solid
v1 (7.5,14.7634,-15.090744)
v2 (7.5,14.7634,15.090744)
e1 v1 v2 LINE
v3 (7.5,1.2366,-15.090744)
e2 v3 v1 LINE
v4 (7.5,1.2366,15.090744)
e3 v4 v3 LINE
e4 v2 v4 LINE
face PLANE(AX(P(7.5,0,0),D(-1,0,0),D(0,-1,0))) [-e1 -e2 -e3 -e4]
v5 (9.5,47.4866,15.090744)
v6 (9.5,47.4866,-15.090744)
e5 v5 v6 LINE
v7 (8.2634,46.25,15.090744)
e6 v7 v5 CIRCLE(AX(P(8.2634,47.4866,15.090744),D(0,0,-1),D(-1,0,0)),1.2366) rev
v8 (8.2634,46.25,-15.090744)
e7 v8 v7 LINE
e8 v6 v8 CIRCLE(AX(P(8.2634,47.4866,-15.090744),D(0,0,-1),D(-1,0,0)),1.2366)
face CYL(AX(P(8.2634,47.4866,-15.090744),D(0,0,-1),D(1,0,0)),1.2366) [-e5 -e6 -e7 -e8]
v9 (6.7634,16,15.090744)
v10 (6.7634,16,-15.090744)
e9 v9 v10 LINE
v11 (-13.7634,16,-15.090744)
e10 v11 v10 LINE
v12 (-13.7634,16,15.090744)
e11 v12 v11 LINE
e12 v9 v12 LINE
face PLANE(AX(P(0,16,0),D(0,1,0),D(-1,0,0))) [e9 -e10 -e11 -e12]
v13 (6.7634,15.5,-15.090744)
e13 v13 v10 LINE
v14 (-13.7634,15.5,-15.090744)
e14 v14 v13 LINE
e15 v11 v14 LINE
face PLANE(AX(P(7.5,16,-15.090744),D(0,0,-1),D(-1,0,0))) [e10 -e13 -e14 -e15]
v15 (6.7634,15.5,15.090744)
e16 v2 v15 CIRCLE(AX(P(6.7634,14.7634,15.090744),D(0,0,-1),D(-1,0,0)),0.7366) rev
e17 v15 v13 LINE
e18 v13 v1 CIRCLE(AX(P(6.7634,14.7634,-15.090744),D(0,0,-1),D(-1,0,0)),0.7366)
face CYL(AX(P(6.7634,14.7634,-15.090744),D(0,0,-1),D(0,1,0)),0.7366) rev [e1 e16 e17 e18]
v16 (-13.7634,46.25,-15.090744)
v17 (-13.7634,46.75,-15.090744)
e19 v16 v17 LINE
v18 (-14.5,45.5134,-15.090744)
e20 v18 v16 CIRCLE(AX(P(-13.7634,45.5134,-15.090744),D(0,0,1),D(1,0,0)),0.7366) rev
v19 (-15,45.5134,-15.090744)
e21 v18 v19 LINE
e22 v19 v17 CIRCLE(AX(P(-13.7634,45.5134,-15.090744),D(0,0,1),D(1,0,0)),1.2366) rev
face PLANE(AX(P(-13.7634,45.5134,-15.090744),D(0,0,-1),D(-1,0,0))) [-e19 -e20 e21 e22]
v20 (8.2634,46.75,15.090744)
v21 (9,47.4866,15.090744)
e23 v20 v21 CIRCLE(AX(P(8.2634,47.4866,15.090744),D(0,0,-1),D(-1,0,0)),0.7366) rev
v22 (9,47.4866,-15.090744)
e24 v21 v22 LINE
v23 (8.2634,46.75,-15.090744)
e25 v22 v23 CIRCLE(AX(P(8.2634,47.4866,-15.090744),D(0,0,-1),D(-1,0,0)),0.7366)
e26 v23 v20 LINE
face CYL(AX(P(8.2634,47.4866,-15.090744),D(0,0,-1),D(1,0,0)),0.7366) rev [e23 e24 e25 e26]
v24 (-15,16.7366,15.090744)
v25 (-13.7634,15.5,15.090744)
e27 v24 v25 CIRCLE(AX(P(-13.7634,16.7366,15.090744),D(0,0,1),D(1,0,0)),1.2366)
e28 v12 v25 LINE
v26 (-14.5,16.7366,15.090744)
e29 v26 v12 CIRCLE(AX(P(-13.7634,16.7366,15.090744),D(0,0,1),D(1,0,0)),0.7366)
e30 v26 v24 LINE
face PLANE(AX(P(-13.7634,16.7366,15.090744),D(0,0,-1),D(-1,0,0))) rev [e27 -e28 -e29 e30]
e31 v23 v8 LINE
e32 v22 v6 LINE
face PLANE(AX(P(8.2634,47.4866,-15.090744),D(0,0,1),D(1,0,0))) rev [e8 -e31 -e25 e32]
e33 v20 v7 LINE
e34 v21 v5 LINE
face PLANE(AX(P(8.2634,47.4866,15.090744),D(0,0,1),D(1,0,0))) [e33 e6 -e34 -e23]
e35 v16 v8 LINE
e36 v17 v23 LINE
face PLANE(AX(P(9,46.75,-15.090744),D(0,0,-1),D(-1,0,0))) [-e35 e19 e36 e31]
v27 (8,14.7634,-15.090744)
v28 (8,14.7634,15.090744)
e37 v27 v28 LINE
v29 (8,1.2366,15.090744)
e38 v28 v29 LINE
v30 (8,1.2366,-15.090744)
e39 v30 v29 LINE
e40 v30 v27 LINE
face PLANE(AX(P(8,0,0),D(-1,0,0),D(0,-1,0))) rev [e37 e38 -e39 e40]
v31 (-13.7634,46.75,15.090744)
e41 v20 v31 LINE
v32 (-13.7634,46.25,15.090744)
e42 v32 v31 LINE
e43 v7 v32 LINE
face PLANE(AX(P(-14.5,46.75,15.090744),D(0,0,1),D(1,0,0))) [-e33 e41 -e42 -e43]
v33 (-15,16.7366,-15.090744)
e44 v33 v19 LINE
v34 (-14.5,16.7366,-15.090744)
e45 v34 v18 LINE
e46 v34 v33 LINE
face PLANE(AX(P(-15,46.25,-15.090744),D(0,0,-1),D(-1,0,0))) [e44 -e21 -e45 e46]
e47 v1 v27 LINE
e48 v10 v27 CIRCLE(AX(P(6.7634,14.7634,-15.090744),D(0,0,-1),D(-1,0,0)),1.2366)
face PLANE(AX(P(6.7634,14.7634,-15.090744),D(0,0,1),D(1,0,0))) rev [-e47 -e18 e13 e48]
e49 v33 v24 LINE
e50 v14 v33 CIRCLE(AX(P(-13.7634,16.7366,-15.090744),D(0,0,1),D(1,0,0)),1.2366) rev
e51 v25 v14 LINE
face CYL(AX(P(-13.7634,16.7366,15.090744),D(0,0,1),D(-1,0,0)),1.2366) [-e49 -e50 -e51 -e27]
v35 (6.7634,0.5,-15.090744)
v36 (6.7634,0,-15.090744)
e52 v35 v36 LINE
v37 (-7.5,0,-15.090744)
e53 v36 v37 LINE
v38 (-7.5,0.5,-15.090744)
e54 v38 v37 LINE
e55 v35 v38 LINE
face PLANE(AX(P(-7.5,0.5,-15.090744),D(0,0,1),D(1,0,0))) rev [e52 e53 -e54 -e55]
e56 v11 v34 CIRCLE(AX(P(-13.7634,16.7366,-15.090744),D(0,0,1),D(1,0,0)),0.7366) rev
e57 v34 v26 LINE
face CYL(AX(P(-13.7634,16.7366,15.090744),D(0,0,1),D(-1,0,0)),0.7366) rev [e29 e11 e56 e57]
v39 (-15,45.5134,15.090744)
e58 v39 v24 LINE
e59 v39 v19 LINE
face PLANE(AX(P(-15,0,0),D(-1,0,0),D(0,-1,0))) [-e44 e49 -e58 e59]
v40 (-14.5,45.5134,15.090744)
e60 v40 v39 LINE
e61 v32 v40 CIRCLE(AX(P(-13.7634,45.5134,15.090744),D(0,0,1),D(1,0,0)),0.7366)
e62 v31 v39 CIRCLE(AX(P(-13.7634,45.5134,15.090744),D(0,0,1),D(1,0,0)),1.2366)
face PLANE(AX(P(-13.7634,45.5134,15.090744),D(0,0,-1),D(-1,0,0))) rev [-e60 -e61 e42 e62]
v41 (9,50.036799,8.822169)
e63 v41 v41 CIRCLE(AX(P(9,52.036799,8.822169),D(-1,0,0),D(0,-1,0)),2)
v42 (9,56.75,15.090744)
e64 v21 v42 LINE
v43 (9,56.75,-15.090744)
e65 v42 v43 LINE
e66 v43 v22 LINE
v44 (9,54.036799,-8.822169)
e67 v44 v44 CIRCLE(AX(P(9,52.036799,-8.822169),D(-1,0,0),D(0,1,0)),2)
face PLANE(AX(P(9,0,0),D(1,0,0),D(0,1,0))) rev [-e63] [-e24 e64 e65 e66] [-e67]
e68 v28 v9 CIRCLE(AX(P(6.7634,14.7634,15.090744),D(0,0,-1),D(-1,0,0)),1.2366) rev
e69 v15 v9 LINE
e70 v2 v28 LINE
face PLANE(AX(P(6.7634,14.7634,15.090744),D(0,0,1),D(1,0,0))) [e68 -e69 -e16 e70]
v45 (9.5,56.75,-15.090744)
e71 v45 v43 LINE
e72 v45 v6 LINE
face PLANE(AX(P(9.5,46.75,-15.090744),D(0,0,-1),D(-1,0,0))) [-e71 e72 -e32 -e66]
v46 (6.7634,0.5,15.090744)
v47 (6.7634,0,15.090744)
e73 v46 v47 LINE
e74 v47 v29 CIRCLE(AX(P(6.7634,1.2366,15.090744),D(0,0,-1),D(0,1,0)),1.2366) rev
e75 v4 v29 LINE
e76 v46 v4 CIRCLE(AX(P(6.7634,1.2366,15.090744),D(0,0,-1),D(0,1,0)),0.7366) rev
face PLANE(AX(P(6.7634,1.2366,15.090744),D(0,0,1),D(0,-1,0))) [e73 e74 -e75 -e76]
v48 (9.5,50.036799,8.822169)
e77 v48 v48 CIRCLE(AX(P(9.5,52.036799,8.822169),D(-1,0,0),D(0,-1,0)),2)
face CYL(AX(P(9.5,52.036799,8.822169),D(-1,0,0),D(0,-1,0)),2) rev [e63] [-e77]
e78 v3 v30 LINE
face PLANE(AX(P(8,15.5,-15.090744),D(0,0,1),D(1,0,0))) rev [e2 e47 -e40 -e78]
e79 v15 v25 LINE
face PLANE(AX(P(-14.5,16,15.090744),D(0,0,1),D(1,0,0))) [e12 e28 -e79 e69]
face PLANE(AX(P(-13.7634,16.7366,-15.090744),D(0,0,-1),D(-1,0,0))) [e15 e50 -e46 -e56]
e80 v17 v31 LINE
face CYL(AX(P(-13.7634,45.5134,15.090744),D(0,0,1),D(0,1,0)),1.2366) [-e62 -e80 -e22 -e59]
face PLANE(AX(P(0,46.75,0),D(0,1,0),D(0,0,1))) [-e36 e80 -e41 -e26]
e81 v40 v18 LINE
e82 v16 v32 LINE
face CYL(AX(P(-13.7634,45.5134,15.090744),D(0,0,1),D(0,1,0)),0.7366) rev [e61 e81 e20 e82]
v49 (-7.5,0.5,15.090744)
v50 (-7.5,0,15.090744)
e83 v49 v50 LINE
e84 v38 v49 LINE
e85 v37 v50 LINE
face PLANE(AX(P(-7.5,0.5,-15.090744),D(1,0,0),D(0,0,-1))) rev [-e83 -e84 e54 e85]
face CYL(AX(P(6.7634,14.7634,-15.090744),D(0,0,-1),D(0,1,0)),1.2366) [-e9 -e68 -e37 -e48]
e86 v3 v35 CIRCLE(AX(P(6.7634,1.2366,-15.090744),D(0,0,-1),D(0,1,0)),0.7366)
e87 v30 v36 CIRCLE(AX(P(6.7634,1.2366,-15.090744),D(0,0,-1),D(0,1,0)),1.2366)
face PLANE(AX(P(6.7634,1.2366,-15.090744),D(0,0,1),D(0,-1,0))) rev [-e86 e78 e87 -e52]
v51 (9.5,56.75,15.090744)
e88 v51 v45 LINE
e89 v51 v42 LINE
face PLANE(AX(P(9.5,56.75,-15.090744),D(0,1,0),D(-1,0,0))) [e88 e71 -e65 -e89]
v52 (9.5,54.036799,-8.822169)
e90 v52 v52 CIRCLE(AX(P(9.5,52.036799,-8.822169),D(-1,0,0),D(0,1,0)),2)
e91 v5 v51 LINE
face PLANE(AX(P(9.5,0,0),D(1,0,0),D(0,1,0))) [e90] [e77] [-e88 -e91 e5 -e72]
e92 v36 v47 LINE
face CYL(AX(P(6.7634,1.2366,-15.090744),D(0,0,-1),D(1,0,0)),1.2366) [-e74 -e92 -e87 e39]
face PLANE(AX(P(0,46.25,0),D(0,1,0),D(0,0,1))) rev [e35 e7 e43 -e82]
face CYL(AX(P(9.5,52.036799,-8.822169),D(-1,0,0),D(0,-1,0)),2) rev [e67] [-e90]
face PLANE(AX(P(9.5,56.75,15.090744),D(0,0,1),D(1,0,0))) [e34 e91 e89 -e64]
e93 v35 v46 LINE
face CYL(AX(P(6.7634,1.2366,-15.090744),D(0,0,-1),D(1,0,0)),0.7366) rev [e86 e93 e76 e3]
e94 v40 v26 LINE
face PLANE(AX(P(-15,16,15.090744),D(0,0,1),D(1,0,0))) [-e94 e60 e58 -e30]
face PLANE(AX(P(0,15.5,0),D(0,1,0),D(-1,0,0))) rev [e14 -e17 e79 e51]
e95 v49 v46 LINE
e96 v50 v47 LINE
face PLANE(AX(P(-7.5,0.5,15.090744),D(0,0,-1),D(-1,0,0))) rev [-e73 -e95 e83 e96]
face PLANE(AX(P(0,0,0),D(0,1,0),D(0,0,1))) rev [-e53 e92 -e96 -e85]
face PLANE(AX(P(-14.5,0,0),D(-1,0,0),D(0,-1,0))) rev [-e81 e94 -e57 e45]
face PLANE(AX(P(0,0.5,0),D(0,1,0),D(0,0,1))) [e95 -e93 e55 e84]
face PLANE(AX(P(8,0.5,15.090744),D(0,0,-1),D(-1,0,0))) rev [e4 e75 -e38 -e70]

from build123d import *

# Parameters (mm, degrees)
SKETCH1_W                    = 15
SKETCH1_H                    = 30.181487224
BASE_FLANGE2_DEPTH           = 0.5
EDGE_FLANGE1_STRIP_W         = 3.4732
EDGE_FLANGE1_STRIP_H         = 0.5
EDGE_FLANGE1_STRIP_CUT_DEPTH = 30.181487223
EDGE_FLANGE1_DEPTH           = 30.181487223
EDGE_FLANGE2_STRIP_W         = 3.4732
EDGE_FLANGE2_STRIP_H         = 0.5
EDGE_FLANGE2_STRIP_CUT_DEPTH = 30.181487223
EDGE_FLANGE2_DEPTH           = 30.181487223
EDGE_FLANGE6_STRIP_W         = 3.4732
EDGE_FLANGE6_STRIP_H         = 0.5
EDGE_FLANGE6_STRIP_CUT_DEPTH = 30.181487223
EDGE_FLANGE6_DEPTH           = 30.181487223
EDGE_FLANGE7_STRIP_W         = 3.4732
EDGE_FLANGE7_STRIP_H         = 0.5
EDGE_FLANGE7_STRIP_CUT_DEPTH = 30.181487223
EDGE_FLANGE7_DEPTH           = 30.181487223
EDGE_FLANGE8_STRIP_W         = 3.4732
EDGE_FLANGE8_STRIP_H         = 0.5
EDGE_FLANGE8_STRIP_CUT_DEPTH = 30.181487223
EDGE_FLANGE8_DEPTH           = 30.181487223
SKETCH58_R                   = 2
CUT_EXTRUDE1_DEPTH           = 64.437315854


# Sheet-metal steps are written as plain solids
with BuildPart() as part:
    # Sketch1 → Base-Flange2 (new body)
    with BuildSketch(Plane(origin=(0, 0, 0), x_dir=(1, 0, 0), z_dir=(0, 1, 0))):
        Rectangle(SKETCH1_W, SKETCH1_H)
    extrude(amount=BASE_FLANGE2_DEPTH)

    # Edge-Flange1 strip (across the edge) → Edge-Flange1 strip cut (cut)
    with BuildSketch(Plane(origin=(7.5, 0.5, 15.090743612), x_dir=(-1, 0, 0), z_dir=(0, 0, -1))):
        with Locations((-1, -0.25)):
            Rectangle(EDGE_FLANGE1_STRIP_W, EDGE_FLANGE1_STRIP_H)
    extrude(amount=EDGE_FLANGE1_STRIP_CUT_DEPTH, mode=Mode.SUBTRACT)

    # Edge-Flange1 section (across the edge) → Edge-Flange1 (add)
    with BuildSketch(Plane(origin=(7.5, 0.5, 15.090743612), x_dir=(-1, 0, 0), z_dir=(0, 0, -1))):
        with BuildLine():
            Line((-0.5, 0.7366), (-0.5, 15))
            Line((-0.5, 15), (0, 15))
            Line((0, 15), (0, 0.7366))
            ThreePointArc((0, 0.7366), (0.215745145, 0.215745145), (0.7366, 0))
            Line((0.7366, 0), (0.7366, -0.5))
            ThreePointArc((0.7366, -0.5), (-0.137808246, -0.137808246), (-0.5, 0.7366))
        make_face()
    extrude(amount=EDGE_FLANGE1_DEPTH)

    # Edge-Flange2 strip (across the edge) → Edge-Flange2 strip cut (cut)
    with BuildSketch(Plane(origin=(7.5, 15.5, 15.090743612), x_dir=(0, -1, 0), z_dir=(0, 0, -1))):
        with Locations((-1, -0.25)):
            Rectangle(EDGE_FLANGE2_STRIP_W, EDGE_FLANGE2_STRIP_H)
    extrude(amount=EDGE_FLANGE2_STRIP_CUT_DEPTH, mode=Mode.SUBTRACT)

    # Edge-Flange2 section (across the edge) → Edge-Flange2 (add)
    with BuildSketch(Plane(origin=(7.5, 15.5, 15.090743612), x_dir=(0, -1, 0), z_dir=(0, 0, -1))):
        with BuildLine():
            Line((-0.5, 0.7366), (-0.5, 22))
            Line((-0.5, 22), (0, 22))
            Line((0, 22), (0, 0.7366))
            ThreePointArc((0, 0.7366), (0.215745145, 0.215745145), (0.7366, 0))
            Line((0.7366, 0), (0.7366, -0.5))
            ThreePointArc((0.7366, -0.5), (-0.137808246, -0.137808246), (-0.5, 0.7366))
        make_face()
    extrude(amount=EDGE_FLANGE2_DEPTH)

    # Edge-Flange6 strip (across the edge) → Edge-Flange6 strip cut (cut)
    with BuildSketch(Plane(origin=(-14.5, 16, -15.090743612), x_dir=(1, 0, 0), z_dir=(0, 0, 1))):
        with Locations((-1, -0.25)):
            Rectangle(EDGE_FLANGE6_STRIP_W, EDGE_FLANGE6_STRIP_H)
    extrude(amount=EDGE_FLANGE6_STRIP_CUT_DEPTH, mode=Mode.SUBTRACT)

    # Edge-Flange6 section (across the edge) → Edge-Flange6 (add)
    with BuildSketch(Plane(origin=(-14.5, 16, -15.090743612), x_dir=(1, 0, 0), z_dir=(0, 0, 1))):
        with BuildLine():
            Line((-0.5, 0.7366), (-0.5, 30.25))
            Line((-0.5, 30.25), (0, 30.25))
            Line((0, 30.25), (0, 0.7366))
            ThreePointArc((0, 0.7366), (0.215745145, 0.215745145), (0.7366, 0))
            Line((0.7366, 0), (0.7366, -0.5))
            ThreePointArc((0.7366, -0.5), (-0.137808246, -0.137808246), (-0.5, 0.7366))
        make_face()
    extrude(amount=EDGE_FLANGE6_DEPTH)

    # Edge-Flange7 strip (across the edge) → Edge-Flange7 strip cut (cut)
    with BuildSketch(Plane(origin=(-14.5, 46.25, -15.090743612), x_dir=(0, -1, 0), z_dir=(0, 0, 1))):
        with Locations((-1, -0.25)):
            Rectangle(EDGE_FLANGE7_STRIP_W, EDGE_FLANGE7_STRIP_H)
    extrude(amount=EDGE_FLANGE7_STRIP_CUT_DEPTH, mode=Mode.SUBTRACT)

    # Edge-Flange7 section (across the edge) → Edge-Flange7 (add)
    with BuildSketch(Plane(origin=(-14.5, 46.25, -15.090743612), x_dir=(0, -1, 0), z_dir=(0, 0, 1))):
        with BuildLine():
            Line((-0.5, 0.7366), (-0.5, 23.5))
            Line((-0.5, 23.5), (0, 23.5))
            Line((0, 23.5), (0, 0.7366))
            ThreePointArc((0, 0.7366), (0.215745145, 0.215745145), (0.7366, 0))
            Line((0.7366, 0), (0.7366, -0.5))
            ThreePointArc((0.7366, -0.5), (-0.137808246, -0.137808246), (-0.5, 0.7366))
        make_face()
    extrude(amount=EDGE_FLANGE7_DEPTH)

    # Edge-Flange8 strip (across the edge) → Edge-Flange8 strip cut (cut)
    with BuildSketch(Plane(origin=(9, 46.75, 15.090743612), x_dir=(-1, 0, 0), z_dir=(0, 0, -1))):
        with Locations((-1, -0.25)):
            Rectangle(EDGE_FLANGE8_STRIP_W, EDGE_FLANGE8_STRIP_H)
    extrude(amount=EDGE_FLANGE8_STRIP_CUT_DEPTH, mode=Mode.SUBTRACT)

    # Edge-Flange8 section (across the edge) → Edge-Flange8 (add)
    with BuildSketch(Plane(origin=(9, 46.75, 15.090743612), x_dir=(-1, 0, 0), z_dir=(0, 0, -1))):
        with BuildLine():
            Line((-0.5, 0.7366), (-0.5, 10))
            Line((-0.5, 10), (0, 10))
            Line((0, 10), (0, 0.7366))
            ThreePointArc((0, 0.7366), (0.215745145, 0.215745145), (0.7366, 0))
            Line((0.7366, 0), (0.7366, -0.5))
            ThreePointArc((0.7366, -0.5), (-0.137808246, -0.137808246), (-0.5, 0.7366))
        make_face()
    extrude(amount=EDGE_FLANGE8_DEPTH)

    # Sketch58 → Cut-Extrude1 (cut, through all)
    with BuildSketch(Plane.ZY.offset(-9)):
        with Locations(Location((8.82216851, 52.036798661, 0), (0, 0, 270))):
            Circle(SKETCH58_R)
        with Locations(Location((-8.82216851, 52.036798661, 0), (0, 0, 90))):
            Circle(SKETCH58_R)
    extrude(amount=-CUT_EXTRUDE1_DEPTH, mode=Mode.SUBTRACT)


solid = part.part
